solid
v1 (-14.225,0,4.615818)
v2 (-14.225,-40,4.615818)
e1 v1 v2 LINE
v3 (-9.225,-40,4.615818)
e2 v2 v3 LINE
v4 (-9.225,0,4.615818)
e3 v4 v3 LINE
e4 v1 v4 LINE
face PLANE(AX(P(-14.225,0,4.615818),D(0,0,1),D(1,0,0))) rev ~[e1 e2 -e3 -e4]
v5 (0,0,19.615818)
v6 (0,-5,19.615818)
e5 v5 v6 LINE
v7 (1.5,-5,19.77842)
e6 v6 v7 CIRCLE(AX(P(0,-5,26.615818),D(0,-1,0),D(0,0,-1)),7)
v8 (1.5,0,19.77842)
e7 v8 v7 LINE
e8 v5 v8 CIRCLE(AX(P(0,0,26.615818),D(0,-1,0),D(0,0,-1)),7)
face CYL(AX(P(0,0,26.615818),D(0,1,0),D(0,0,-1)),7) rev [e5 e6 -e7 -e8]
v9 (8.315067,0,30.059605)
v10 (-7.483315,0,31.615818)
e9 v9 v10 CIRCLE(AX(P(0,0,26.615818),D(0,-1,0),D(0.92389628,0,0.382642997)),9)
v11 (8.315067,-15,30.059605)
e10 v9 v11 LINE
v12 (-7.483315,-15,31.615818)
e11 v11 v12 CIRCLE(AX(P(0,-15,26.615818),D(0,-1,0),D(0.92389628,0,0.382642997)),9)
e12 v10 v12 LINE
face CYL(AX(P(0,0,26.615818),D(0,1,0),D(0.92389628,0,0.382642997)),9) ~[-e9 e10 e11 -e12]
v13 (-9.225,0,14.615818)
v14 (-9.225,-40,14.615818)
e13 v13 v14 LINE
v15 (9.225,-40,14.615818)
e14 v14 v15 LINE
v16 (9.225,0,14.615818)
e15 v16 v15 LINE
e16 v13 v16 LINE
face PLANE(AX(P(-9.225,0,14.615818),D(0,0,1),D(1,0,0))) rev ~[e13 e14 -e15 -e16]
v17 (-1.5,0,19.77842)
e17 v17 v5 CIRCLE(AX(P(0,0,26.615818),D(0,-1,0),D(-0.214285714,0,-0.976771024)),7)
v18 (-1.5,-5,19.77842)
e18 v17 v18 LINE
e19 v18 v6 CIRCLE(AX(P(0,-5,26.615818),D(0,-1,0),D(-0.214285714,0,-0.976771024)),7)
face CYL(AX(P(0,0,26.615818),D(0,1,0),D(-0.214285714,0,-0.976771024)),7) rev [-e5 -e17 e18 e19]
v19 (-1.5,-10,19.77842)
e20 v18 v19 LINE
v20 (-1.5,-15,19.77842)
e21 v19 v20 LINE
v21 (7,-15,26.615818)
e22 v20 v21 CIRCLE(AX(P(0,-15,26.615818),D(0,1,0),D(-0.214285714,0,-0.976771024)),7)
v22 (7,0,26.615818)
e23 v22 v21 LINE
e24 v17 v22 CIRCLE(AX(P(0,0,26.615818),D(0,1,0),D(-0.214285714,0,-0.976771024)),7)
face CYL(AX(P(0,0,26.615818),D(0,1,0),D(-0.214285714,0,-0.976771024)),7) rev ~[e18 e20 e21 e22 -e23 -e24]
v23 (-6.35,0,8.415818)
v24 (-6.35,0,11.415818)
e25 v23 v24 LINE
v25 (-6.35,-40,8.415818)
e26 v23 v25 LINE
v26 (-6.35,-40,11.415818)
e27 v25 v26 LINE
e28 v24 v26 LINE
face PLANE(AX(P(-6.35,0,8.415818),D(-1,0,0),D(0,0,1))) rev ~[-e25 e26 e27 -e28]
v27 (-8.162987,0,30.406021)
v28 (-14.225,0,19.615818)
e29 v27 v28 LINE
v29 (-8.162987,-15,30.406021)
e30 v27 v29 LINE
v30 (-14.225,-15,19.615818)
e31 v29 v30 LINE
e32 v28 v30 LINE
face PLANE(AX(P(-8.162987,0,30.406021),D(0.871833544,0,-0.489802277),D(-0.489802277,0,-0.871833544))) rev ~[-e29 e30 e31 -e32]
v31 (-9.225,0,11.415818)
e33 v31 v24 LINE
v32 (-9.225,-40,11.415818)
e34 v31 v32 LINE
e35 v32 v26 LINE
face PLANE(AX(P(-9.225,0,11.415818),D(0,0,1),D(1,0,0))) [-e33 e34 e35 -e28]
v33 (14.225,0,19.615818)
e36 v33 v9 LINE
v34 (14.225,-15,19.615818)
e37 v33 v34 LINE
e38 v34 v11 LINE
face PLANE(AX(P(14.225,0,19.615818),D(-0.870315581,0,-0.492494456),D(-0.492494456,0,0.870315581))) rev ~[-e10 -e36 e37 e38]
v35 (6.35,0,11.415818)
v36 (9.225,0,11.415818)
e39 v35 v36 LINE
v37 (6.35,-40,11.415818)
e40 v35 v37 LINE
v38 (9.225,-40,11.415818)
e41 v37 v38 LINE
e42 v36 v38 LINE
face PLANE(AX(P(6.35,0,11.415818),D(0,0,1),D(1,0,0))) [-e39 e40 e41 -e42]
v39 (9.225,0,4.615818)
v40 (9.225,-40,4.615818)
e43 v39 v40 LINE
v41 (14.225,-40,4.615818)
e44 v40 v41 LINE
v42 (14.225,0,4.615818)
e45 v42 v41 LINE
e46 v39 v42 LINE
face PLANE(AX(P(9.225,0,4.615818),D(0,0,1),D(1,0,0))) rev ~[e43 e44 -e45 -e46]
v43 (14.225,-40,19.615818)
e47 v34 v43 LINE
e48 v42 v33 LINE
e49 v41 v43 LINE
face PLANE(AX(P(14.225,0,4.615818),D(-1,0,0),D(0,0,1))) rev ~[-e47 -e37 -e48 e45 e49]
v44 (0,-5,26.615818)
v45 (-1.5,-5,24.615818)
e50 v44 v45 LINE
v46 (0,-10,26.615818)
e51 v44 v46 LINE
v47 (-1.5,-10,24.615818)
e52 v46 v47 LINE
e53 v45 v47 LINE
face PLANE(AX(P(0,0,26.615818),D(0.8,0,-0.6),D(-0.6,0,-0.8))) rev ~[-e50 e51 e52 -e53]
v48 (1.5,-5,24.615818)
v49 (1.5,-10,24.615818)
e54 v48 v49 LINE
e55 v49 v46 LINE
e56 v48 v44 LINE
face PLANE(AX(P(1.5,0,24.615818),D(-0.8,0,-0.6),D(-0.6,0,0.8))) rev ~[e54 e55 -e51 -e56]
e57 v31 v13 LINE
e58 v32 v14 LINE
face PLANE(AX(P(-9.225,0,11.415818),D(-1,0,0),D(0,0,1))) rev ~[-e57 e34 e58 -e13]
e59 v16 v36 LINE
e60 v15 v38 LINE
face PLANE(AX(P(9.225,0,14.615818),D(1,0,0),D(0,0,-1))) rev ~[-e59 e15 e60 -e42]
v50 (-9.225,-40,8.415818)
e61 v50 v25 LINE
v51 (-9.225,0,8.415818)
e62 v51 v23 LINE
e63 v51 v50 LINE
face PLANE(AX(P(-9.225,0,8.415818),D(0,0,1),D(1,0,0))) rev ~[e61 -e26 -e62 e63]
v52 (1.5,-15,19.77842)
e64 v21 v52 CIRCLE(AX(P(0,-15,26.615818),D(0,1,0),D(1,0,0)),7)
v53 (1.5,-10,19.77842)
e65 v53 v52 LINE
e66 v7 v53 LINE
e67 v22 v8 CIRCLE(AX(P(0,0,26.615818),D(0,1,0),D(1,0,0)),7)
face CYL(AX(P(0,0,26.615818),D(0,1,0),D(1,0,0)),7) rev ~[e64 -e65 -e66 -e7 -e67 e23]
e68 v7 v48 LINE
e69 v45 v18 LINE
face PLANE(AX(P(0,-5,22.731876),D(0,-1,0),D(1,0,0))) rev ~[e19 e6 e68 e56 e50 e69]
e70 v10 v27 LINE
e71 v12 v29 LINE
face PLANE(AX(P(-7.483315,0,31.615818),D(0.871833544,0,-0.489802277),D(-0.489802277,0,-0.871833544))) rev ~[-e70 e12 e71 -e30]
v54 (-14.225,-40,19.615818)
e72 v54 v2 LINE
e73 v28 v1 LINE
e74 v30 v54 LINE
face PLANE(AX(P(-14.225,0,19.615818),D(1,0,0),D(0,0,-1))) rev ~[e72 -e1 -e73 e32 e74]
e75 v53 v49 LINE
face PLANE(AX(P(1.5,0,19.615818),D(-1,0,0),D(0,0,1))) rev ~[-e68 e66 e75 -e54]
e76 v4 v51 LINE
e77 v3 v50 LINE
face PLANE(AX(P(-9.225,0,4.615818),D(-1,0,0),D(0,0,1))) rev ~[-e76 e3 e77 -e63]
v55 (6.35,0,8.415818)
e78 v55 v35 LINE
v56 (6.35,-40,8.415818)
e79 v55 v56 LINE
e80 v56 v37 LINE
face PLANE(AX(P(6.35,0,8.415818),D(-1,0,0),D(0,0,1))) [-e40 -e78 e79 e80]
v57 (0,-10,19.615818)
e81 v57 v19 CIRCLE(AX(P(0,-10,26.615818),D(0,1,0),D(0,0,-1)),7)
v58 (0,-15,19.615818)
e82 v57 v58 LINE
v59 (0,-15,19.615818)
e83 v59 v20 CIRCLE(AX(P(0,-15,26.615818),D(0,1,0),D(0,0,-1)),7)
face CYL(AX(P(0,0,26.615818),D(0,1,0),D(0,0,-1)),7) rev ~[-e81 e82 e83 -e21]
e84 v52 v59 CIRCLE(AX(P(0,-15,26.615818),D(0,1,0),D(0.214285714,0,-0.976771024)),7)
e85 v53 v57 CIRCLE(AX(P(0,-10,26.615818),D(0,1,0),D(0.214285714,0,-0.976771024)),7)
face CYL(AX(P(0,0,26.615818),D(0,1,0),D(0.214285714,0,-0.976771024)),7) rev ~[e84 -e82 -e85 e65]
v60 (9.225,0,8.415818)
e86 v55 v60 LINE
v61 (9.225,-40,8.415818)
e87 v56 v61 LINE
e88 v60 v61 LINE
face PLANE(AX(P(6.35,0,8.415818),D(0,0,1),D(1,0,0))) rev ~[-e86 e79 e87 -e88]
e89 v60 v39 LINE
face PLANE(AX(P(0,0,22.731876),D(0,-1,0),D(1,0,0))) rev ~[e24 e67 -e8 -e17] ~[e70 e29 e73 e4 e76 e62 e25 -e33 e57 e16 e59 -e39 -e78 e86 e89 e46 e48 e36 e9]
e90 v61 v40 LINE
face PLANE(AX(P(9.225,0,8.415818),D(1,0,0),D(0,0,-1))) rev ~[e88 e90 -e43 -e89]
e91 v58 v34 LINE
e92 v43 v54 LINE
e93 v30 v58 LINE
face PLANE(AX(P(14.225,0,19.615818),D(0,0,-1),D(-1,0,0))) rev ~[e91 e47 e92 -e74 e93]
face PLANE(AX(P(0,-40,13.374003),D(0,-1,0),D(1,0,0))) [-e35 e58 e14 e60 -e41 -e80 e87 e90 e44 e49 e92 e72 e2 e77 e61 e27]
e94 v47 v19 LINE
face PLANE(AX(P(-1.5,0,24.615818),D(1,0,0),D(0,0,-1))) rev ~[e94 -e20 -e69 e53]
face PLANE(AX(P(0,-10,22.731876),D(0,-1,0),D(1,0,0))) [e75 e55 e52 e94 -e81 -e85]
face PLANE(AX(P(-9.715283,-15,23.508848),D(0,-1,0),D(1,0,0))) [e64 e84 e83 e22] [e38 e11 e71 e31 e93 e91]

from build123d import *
from build123d import SkipClean  # not in build123d's __all__

# Parameters (mm, degrees)
F0_W     = 2.875
F0_H     = 3
F1_DEPTH = 40
F2_DEPTH = 15
F3_DEPTH = 10
F4_DEPTH = 15
F5_DEPTH = 5


with BuildPart() as f1:
    # F0 (on Front) → F1 (new body)
    with BuildSketch(Plane.XZ):
        Polygon((-9.225, 4.615817529), (-9.225, 8.415817529), (-9.225, 11.415817529), (-9.225, 14.615817529), (9.225, 14.615817529), (9.225, 11.415817529), (9.225, 8.415817529), (9.225, 4.615817529), (14.225, 4.615817529), (14.225, 19.615817529), (5.6568542495, 19.615817529), (1.5, 19.615817529), (0, 19.615817529), (-1.5, 19.615817529), (-5.6568542495, 19.615817529), (-14.225, 19.615817529), (-14.225, 4.615817529), align=None)
        with Locations((-7.7875, 9.915817529)):
            Rectangle(F0_W, F0_H)
        with Locations((7.7875, 9.915817529)):
            Rectangle(F0_W, F0_H)
    extrude(amount=F1_DEPTH)

    # F0 (on Front) → F2 (join)
    with BuildSketch(Plane.XZ):
        with BuildLine():
            Line((-8.1629870472, 30.4060210151), (-14.225, 19.615817529))
            Line((-14.225, 19.615817529), (-5.6568542495, 19.615817529))
            ThreePointArc((-5.6568542495, 19.615817529), (-8.766648515, 24.5796756343), (-8.1629870472, 30.4060210151))
        make_face()
        with BuildLine():
            ThreePointArc((-8.1629870472, 30.4060210151), (-8.766648515, 24.5796756343), (-5.6568542495, 19.615817529))
            Line((-5.6568542495, 19.615817529), (-1.5, 19.615817529))
            Line((-1.5, 19.615817529), (-1.5, 19.7784203634))
            ThreePointArc((-1.5, 19.7784203634), (-4.3874821937, 32.0701735863), (7, 26.615817529))
            ThreePointArc((7, 26.615817529), (5.4543560573, 22.2283353353), (1.5, 19.7784203634))
            Line((1.5, 19.7784203634), (1.5, 19.615817529))
            Line((1.5, 19.615817529), (5.6568542495, 19.615817529))
            ThreePointArc((5.6568542495, 19.615817529), (8.7219157357, 24.3958657503), (8.3150665238, 30.0596045005))
            ThreePointArc((8.3150665238, 30.0596045005), (0.8822712117, 35.5724685498), (-7.4833147735, 31.615817529))
            Line((-7.4833147735, 31.615817529), (-8.1629870472, 30.4060210151))
        make_face()
        with BuildLine():
            Line((5.6568542495, 19.615817529), (14.225, 19.615817529))
            Line((14.225, 19.615817529), (8.3150665238, 30.0596045005))
            ThreePointArc((8.3150665238, 30.0596045005), (8.7219157357, 24.3958657503), (5.6568542495, 19.615817529))
        make_face()
    extrude(amount=F2_DEPTH)

    # F0 (on Front) → F3 (join)
    with BuildSketch(Plane.XZ):
        with BuildLine():
            ThreePointArc((-1.5, 19.7784203634), (-0.7543937436, 19.6565869623), (0, 19.615817529))
            ThreePointArc((0, 19.615817529), (0.7543937436, 19.6565869623), (1.5, 19.7784203634))
            Line((1.5, 19.7784203634), (1.5, 24.615817529))
            Line((1.5, 24.615817529), (0, 26.615817529))
            Line((0, 26.615817529), (-1.5, 24.615817529))
            Line((-1.5, 24.615817529), (-1.5, 19.7784203634))
        make_face()
        with BuildLine():
            Line((-1.5, 19.7784203634), (-1.5, 19.615817529))
            Line((-1.5, 19.615817529), (0, 19.615817529))
            ThreePointArc((0, 19.615817529), (-0.7543937436, 19.6565869623), (-1.5, 19.7784203634))
        make_face()
        with BuildLine():
            Line((0, 19.615817529), (1.5, 19.615817529))
            Line((1.5, 19.615817529), (1.5, 19.7784203634))
            ThreePointArc((1.5, 19.7784203634), (0.7543937436, 19.6565869623), (0, 19.615817529))
        make_face()
    extrude(amount=F3_DEPTH)

    # F0 (on Front) → F4 (join)
    with BuildSketch(Plane.XZ):
        with BuildLine():
            Line((0, 19.615817529), (1.5, 19.615817529))
            Line((1.5, 19.615817529), (1.5, 19.7784203634))
            ThreePointArc((1.5, 19.7784203634), (0.7543937436, 19.6565869623), (0, 19.615817529))
        make_face()
        with BuildLine():
            Line((-1.5, 19.7784203634), (-1.5, 19.615817529))
            Line((-1.5, 19.615817529), (0, 19.615817529))
            ThreePointArc((0, 19.615817529), (-0.7543937436, 19.6565869623), (-1.5, 19.7784203634))
        make_face()
    extrude(amount=F4_DEPTH)

    # F0 (on Front) → F5 (cut)
    with BuildSketch(Plane.XZ):
        with BuildLine():
            ThreePointArc((-1.5, 19.7784203634), (-0.7543937436, 19.6565869623), (0, 19.615817529))
            ThreePointArc((0, 19.615817529), (0.7543937436, 19.6565869623), (1.5, 19.7784203634))
            Line((1.5, 19.7784203634), (1.5, 24.615817529))
            Line((1.5, 24.615817529), (0, 26.615817529))
            Line((0, 26.615817529), (-1.5, 24.615817529))
            Line((-1.5, 24.615817529), (-1.5, 19.7784203634))
        make_face()
    with SkipClean():  # cleaning this boolean's faces spoils the solid; the shape is the same uncleaned
        extrude(amount=F5_DEPTH, mode=Mode.SUBTRACT)


solid = f1.part
